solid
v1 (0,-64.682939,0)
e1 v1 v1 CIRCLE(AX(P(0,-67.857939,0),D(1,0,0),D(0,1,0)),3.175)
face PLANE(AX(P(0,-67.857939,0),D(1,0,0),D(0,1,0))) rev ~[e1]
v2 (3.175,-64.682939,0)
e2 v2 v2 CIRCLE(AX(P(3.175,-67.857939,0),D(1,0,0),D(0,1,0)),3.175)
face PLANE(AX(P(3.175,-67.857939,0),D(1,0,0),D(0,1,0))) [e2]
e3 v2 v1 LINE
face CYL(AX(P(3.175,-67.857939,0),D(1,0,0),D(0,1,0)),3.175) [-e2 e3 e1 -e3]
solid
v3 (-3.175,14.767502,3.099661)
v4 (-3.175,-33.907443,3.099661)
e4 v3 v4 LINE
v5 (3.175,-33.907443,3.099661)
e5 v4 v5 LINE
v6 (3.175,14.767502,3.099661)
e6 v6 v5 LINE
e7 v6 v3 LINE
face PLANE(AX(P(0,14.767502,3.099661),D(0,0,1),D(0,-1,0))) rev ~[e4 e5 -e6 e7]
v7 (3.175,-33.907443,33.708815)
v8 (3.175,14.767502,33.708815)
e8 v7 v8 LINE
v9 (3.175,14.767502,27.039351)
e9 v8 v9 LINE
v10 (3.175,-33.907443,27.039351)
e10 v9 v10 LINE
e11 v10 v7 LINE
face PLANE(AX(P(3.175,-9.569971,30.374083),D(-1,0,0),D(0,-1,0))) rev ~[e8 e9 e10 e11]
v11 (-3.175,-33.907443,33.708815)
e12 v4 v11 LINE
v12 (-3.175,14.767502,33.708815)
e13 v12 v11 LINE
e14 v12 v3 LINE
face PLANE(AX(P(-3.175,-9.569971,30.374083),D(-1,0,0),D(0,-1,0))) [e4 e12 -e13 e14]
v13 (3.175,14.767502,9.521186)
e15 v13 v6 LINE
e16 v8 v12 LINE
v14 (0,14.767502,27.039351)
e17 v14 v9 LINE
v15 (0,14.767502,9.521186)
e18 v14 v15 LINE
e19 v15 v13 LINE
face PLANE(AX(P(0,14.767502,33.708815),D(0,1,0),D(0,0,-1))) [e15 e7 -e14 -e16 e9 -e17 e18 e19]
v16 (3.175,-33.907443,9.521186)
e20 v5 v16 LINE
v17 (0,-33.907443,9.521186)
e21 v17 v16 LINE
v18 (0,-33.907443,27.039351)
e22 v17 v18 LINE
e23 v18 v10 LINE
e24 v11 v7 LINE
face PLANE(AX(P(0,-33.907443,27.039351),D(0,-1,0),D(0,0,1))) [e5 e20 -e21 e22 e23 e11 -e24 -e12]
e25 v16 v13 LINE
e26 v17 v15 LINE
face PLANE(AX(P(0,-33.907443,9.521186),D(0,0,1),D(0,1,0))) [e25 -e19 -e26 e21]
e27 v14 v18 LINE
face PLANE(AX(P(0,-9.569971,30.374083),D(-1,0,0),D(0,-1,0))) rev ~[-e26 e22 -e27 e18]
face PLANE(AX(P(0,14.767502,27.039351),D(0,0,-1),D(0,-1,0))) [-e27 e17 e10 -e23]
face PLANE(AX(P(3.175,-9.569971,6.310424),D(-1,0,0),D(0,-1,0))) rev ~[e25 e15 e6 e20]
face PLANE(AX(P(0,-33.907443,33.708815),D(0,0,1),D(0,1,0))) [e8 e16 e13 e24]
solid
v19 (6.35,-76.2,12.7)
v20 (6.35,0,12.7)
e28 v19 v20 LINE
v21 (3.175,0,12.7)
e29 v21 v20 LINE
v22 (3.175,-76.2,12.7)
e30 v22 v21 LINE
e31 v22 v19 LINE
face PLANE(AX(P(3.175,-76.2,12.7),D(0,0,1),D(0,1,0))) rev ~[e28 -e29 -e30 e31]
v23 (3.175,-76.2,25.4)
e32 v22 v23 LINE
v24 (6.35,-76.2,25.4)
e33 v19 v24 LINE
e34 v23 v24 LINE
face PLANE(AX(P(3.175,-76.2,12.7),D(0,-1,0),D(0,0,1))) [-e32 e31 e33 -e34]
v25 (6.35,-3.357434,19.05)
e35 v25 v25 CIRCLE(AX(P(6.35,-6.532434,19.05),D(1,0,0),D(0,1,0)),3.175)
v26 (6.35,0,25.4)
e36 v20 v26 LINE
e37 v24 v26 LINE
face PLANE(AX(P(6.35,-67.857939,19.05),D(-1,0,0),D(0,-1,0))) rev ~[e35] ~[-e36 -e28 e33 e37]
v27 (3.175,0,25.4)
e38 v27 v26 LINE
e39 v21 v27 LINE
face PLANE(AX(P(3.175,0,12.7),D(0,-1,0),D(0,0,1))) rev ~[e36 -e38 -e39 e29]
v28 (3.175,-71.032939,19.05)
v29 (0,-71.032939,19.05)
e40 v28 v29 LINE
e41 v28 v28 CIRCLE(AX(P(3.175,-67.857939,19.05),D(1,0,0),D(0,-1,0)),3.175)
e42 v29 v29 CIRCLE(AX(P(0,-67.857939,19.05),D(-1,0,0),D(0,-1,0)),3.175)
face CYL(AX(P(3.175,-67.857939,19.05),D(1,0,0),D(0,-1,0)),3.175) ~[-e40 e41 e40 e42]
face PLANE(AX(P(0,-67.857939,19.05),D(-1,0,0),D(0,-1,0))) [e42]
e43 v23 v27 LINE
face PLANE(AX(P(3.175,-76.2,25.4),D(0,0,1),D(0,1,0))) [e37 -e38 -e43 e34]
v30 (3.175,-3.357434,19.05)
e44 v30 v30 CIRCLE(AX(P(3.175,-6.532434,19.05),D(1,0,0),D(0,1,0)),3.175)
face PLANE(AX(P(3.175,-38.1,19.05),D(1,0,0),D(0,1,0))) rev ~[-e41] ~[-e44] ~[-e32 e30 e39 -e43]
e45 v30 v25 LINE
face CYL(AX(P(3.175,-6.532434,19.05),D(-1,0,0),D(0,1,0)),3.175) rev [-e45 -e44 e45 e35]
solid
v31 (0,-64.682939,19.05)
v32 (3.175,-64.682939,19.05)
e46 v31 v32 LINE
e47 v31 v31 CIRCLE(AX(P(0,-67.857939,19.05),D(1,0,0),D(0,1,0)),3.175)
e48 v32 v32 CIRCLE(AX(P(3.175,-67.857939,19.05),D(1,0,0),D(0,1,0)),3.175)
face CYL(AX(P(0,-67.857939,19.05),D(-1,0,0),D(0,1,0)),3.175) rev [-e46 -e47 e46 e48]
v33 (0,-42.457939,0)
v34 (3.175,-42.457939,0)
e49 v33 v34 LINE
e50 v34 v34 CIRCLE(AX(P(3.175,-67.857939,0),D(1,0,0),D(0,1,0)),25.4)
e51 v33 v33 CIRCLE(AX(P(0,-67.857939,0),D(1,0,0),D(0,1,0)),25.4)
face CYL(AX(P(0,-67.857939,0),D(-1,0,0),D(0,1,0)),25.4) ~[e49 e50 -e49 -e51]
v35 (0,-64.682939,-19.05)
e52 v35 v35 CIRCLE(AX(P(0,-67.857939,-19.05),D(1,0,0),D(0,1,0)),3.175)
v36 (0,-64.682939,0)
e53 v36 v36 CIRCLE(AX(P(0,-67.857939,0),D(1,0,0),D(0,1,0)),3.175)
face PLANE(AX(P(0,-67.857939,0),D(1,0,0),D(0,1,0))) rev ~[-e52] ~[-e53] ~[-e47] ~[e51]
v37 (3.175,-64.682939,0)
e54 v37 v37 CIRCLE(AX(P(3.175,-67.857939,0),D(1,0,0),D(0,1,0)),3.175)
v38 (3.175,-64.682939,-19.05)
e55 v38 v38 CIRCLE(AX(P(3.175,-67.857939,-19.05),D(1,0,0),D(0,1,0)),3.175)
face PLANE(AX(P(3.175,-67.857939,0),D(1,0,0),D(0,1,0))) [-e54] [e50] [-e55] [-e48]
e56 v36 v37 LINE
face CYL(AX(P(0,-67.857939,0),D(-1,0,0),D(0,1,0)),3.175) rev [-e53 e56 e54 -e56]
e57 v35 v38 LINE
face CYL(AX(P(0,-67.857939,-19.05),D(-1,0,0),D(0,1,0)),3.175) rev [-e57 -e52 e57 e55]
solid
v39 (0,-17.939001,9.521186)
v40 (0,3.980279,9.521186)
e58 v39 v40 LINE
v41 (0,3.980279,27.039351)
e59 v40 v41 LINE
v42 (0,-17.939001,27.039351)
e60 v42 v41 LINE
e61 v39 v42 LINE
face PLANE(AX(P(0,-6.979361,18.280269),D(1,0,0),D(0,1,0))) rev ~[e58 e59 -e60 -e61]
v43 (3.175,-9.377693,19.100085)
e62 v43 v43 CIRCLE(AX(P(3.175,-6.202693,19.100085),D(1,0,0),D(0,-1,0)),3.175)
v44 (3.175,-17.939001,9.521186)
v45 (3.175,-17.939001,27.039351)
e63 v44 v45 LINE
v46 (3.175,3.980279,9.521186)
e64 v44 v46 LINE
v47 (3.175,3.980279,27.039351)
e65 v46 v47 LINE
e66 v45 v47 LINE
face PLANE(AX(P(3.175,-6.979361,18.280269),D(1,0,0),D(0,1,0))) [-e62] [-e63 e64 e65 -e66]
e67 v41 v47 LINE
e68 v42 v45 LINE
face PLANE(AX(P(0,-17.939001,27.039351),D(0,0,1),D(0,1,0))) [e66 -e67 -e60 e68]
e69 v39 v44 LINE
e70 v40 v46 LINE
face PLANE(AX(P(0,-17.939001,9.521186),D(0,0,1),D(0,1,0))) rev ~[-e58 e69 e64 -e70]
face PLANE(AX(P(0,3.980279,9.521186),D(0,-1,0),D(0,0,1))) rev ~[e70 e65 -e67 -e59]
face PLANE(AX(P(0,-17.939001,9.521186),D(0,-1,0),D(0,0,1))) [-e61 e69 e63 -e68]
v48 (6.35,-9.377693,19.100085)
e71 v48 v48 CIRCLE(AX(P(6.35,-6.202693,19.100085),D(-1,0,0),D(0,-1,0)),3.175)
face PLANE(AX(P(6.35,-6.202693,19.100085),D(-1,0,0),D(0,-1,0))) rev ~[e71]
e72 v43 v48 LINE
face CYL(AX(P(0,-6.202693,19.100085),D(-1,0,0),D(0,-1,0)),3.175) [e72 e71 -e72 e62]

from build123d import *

# Parameters (mm, degrees)
F0_R          = 25.4
F0_R_2        = 3.175
F1_DEPTH      = 3.175
F2_R          = 3.175
F3_DEPTH      = 3.175
F4_W          = 76.2
F4_H          = 12.7
F4_R          = 3.175
F5_DEPTH      = 3.175
F6_R          = 3.175
F7_DEPTH      = 3.175
F7_DEPTH_BACK = 3.175
F8_W          = 21.9192807563
F8_H          = 17.51816459
F8_R          = 3.175
F9_DEPTH      = 3.175
F10_R         = 3.175
F11_DEPTH     = 6.35
F13_W         = 48.6749447882
F13_H         = 6.6694635898
F13_H_2       = 17.51816459
F13_H_3       = 6.4215252642
F14_DEPTH     = 3.175
F15_DEPTH     = 3.175


with BuildPart() as f1:
    # F0 (on Right) → F1 (new body)
    with BuildSketch(Plane.YZ):
        with Locations((-67.8579392607, 0)):
            Circle(F0_R)
        with Locations((-67.8579392607, 0)):
            Circle(F0_R_2, mode=Mode.SUBTRACT)
        with Locations((-67.8579392607, -19.0500002354)):
            Circle(F0_R_2, mode=Mode.SUBTRACT)
        with Locations((-67.8579392607, 19.0500002354)):
            Circle(F0_R_2, mode=Mode.SUBTRACT)
    extrude(amount=F1_DEPTH)


with BuildPart() as f3:
    # F2 (on face) → F3 (new body)
    with BuildSketch(Plane.YZ.offset(3.175)):
        with Locations((-67.8579392607, 0)):
            Circle(F2_R)
    extrude(amount=-F3_DEPTH)


with BuildPart() as f5:
    # F4 (on face) → F5 (new body)
    with BuildSketch(Plane.YZ.offset(3.175)):
        with Locations((-38.1, 19.05)):
            Rectangle(F4_W, F4_H)
        with Locations((-67.8579392607, 19.0500002354)):
            Circle(F4_R, mode=Mode.SUBTRACT)
        with Locations((-6.5324339084, 19.05)):
            Circle(F4_R, mode=Mode.SUBTRACT)
    extrude(amount=F5_DEPTH)

    # F6 (on face) → F7 (join, two sides)
    with BuildSketch(Plane(origin=(3.175, 0, 0), x_dir=(0, -1, 0), z_dir=(-1, 0, 0))) as f7_sk:
        with Locations((67.8579392607, 19.0500002354)):
            Circle(F6_R)
    extrude(amount=F7_DEPTH)
    extrude(f7_sk.sketch, amount=-F7_DEPTH_BACK)


with BuildPart() as f9:
    # F8 (on Right) → F9 (new body)
    with BuildSketch(Plane.YZ):
        with Locations((-6.9793609437, 18.2802686468)):
            Rectangle(F8_W, F8_H)
        with Locations((-6.2026930973, 19.1000849009)):
            Circle(F8_R, mode=Mode.SUBTRACT)
    extrude(amount=F9_DEPTH)

    # F10 (on face) → F11 (join)
    with BuildSketch(Plane(origin=(0, 0, 0), x_dir=(0, -1, 0), z_dir=(-1, 0, 0))):
        with Locations((6.2026930973, 19.1000849009)):
            Circle(F10_R)
    extrude(amount=-F11_DEPTH)

    # F12: union 


with BuildPart() as f14:
    # F13 (on face) → F14 (new body)
    with BuildSketch(Plane(origin=(0, 0, 0), x_dir=(0, -1, 0), z_dir=(-1, 0, 0))):
        with Locations((9.5699708909, 30.3740827367)):
            Rectangle(F13_W, F13_H)
        with Locations((9.5699708909, 18.2802686468)):
            Rectangle(F13_W, F13_H_2)
        with Locations((9.5699708909, 6.3104237197)):
            Rectangle(F13_W, F13_H_3)
    extrude(amount=F14_DEPTH)

    # F13 (on face) → F15 (join)
    with BuildSketch(Plane(origin=(0, 0, 0), x_dir=(0, -1, 0), z_dir=(-1, 0, 0))):
        Polygon((33.907443285, 33.7088145316), (-14.7675015032, 33.7088145316), (-14.7675015032, 27.0393509418), (-3.9802794345, 27.0393509418), (17.9390013218, 27.0393509418), (33.907443285, 27.0393509418), align=None)
        Polygon((-3.9802794345, 9.5211863518), (-14.7675015032, 9.5211863518), (-14.7675015032, 3.0996610876), (33.907443285, 3.0996610876), (33.907443285, 9.5211863518), (17.9390013218, 9.5211863518), align=None)
    extrude(amount=-F15_DEPTH)


solid = Compound([f1.part, f3.part, f5.part, f9.part, f14.part])
